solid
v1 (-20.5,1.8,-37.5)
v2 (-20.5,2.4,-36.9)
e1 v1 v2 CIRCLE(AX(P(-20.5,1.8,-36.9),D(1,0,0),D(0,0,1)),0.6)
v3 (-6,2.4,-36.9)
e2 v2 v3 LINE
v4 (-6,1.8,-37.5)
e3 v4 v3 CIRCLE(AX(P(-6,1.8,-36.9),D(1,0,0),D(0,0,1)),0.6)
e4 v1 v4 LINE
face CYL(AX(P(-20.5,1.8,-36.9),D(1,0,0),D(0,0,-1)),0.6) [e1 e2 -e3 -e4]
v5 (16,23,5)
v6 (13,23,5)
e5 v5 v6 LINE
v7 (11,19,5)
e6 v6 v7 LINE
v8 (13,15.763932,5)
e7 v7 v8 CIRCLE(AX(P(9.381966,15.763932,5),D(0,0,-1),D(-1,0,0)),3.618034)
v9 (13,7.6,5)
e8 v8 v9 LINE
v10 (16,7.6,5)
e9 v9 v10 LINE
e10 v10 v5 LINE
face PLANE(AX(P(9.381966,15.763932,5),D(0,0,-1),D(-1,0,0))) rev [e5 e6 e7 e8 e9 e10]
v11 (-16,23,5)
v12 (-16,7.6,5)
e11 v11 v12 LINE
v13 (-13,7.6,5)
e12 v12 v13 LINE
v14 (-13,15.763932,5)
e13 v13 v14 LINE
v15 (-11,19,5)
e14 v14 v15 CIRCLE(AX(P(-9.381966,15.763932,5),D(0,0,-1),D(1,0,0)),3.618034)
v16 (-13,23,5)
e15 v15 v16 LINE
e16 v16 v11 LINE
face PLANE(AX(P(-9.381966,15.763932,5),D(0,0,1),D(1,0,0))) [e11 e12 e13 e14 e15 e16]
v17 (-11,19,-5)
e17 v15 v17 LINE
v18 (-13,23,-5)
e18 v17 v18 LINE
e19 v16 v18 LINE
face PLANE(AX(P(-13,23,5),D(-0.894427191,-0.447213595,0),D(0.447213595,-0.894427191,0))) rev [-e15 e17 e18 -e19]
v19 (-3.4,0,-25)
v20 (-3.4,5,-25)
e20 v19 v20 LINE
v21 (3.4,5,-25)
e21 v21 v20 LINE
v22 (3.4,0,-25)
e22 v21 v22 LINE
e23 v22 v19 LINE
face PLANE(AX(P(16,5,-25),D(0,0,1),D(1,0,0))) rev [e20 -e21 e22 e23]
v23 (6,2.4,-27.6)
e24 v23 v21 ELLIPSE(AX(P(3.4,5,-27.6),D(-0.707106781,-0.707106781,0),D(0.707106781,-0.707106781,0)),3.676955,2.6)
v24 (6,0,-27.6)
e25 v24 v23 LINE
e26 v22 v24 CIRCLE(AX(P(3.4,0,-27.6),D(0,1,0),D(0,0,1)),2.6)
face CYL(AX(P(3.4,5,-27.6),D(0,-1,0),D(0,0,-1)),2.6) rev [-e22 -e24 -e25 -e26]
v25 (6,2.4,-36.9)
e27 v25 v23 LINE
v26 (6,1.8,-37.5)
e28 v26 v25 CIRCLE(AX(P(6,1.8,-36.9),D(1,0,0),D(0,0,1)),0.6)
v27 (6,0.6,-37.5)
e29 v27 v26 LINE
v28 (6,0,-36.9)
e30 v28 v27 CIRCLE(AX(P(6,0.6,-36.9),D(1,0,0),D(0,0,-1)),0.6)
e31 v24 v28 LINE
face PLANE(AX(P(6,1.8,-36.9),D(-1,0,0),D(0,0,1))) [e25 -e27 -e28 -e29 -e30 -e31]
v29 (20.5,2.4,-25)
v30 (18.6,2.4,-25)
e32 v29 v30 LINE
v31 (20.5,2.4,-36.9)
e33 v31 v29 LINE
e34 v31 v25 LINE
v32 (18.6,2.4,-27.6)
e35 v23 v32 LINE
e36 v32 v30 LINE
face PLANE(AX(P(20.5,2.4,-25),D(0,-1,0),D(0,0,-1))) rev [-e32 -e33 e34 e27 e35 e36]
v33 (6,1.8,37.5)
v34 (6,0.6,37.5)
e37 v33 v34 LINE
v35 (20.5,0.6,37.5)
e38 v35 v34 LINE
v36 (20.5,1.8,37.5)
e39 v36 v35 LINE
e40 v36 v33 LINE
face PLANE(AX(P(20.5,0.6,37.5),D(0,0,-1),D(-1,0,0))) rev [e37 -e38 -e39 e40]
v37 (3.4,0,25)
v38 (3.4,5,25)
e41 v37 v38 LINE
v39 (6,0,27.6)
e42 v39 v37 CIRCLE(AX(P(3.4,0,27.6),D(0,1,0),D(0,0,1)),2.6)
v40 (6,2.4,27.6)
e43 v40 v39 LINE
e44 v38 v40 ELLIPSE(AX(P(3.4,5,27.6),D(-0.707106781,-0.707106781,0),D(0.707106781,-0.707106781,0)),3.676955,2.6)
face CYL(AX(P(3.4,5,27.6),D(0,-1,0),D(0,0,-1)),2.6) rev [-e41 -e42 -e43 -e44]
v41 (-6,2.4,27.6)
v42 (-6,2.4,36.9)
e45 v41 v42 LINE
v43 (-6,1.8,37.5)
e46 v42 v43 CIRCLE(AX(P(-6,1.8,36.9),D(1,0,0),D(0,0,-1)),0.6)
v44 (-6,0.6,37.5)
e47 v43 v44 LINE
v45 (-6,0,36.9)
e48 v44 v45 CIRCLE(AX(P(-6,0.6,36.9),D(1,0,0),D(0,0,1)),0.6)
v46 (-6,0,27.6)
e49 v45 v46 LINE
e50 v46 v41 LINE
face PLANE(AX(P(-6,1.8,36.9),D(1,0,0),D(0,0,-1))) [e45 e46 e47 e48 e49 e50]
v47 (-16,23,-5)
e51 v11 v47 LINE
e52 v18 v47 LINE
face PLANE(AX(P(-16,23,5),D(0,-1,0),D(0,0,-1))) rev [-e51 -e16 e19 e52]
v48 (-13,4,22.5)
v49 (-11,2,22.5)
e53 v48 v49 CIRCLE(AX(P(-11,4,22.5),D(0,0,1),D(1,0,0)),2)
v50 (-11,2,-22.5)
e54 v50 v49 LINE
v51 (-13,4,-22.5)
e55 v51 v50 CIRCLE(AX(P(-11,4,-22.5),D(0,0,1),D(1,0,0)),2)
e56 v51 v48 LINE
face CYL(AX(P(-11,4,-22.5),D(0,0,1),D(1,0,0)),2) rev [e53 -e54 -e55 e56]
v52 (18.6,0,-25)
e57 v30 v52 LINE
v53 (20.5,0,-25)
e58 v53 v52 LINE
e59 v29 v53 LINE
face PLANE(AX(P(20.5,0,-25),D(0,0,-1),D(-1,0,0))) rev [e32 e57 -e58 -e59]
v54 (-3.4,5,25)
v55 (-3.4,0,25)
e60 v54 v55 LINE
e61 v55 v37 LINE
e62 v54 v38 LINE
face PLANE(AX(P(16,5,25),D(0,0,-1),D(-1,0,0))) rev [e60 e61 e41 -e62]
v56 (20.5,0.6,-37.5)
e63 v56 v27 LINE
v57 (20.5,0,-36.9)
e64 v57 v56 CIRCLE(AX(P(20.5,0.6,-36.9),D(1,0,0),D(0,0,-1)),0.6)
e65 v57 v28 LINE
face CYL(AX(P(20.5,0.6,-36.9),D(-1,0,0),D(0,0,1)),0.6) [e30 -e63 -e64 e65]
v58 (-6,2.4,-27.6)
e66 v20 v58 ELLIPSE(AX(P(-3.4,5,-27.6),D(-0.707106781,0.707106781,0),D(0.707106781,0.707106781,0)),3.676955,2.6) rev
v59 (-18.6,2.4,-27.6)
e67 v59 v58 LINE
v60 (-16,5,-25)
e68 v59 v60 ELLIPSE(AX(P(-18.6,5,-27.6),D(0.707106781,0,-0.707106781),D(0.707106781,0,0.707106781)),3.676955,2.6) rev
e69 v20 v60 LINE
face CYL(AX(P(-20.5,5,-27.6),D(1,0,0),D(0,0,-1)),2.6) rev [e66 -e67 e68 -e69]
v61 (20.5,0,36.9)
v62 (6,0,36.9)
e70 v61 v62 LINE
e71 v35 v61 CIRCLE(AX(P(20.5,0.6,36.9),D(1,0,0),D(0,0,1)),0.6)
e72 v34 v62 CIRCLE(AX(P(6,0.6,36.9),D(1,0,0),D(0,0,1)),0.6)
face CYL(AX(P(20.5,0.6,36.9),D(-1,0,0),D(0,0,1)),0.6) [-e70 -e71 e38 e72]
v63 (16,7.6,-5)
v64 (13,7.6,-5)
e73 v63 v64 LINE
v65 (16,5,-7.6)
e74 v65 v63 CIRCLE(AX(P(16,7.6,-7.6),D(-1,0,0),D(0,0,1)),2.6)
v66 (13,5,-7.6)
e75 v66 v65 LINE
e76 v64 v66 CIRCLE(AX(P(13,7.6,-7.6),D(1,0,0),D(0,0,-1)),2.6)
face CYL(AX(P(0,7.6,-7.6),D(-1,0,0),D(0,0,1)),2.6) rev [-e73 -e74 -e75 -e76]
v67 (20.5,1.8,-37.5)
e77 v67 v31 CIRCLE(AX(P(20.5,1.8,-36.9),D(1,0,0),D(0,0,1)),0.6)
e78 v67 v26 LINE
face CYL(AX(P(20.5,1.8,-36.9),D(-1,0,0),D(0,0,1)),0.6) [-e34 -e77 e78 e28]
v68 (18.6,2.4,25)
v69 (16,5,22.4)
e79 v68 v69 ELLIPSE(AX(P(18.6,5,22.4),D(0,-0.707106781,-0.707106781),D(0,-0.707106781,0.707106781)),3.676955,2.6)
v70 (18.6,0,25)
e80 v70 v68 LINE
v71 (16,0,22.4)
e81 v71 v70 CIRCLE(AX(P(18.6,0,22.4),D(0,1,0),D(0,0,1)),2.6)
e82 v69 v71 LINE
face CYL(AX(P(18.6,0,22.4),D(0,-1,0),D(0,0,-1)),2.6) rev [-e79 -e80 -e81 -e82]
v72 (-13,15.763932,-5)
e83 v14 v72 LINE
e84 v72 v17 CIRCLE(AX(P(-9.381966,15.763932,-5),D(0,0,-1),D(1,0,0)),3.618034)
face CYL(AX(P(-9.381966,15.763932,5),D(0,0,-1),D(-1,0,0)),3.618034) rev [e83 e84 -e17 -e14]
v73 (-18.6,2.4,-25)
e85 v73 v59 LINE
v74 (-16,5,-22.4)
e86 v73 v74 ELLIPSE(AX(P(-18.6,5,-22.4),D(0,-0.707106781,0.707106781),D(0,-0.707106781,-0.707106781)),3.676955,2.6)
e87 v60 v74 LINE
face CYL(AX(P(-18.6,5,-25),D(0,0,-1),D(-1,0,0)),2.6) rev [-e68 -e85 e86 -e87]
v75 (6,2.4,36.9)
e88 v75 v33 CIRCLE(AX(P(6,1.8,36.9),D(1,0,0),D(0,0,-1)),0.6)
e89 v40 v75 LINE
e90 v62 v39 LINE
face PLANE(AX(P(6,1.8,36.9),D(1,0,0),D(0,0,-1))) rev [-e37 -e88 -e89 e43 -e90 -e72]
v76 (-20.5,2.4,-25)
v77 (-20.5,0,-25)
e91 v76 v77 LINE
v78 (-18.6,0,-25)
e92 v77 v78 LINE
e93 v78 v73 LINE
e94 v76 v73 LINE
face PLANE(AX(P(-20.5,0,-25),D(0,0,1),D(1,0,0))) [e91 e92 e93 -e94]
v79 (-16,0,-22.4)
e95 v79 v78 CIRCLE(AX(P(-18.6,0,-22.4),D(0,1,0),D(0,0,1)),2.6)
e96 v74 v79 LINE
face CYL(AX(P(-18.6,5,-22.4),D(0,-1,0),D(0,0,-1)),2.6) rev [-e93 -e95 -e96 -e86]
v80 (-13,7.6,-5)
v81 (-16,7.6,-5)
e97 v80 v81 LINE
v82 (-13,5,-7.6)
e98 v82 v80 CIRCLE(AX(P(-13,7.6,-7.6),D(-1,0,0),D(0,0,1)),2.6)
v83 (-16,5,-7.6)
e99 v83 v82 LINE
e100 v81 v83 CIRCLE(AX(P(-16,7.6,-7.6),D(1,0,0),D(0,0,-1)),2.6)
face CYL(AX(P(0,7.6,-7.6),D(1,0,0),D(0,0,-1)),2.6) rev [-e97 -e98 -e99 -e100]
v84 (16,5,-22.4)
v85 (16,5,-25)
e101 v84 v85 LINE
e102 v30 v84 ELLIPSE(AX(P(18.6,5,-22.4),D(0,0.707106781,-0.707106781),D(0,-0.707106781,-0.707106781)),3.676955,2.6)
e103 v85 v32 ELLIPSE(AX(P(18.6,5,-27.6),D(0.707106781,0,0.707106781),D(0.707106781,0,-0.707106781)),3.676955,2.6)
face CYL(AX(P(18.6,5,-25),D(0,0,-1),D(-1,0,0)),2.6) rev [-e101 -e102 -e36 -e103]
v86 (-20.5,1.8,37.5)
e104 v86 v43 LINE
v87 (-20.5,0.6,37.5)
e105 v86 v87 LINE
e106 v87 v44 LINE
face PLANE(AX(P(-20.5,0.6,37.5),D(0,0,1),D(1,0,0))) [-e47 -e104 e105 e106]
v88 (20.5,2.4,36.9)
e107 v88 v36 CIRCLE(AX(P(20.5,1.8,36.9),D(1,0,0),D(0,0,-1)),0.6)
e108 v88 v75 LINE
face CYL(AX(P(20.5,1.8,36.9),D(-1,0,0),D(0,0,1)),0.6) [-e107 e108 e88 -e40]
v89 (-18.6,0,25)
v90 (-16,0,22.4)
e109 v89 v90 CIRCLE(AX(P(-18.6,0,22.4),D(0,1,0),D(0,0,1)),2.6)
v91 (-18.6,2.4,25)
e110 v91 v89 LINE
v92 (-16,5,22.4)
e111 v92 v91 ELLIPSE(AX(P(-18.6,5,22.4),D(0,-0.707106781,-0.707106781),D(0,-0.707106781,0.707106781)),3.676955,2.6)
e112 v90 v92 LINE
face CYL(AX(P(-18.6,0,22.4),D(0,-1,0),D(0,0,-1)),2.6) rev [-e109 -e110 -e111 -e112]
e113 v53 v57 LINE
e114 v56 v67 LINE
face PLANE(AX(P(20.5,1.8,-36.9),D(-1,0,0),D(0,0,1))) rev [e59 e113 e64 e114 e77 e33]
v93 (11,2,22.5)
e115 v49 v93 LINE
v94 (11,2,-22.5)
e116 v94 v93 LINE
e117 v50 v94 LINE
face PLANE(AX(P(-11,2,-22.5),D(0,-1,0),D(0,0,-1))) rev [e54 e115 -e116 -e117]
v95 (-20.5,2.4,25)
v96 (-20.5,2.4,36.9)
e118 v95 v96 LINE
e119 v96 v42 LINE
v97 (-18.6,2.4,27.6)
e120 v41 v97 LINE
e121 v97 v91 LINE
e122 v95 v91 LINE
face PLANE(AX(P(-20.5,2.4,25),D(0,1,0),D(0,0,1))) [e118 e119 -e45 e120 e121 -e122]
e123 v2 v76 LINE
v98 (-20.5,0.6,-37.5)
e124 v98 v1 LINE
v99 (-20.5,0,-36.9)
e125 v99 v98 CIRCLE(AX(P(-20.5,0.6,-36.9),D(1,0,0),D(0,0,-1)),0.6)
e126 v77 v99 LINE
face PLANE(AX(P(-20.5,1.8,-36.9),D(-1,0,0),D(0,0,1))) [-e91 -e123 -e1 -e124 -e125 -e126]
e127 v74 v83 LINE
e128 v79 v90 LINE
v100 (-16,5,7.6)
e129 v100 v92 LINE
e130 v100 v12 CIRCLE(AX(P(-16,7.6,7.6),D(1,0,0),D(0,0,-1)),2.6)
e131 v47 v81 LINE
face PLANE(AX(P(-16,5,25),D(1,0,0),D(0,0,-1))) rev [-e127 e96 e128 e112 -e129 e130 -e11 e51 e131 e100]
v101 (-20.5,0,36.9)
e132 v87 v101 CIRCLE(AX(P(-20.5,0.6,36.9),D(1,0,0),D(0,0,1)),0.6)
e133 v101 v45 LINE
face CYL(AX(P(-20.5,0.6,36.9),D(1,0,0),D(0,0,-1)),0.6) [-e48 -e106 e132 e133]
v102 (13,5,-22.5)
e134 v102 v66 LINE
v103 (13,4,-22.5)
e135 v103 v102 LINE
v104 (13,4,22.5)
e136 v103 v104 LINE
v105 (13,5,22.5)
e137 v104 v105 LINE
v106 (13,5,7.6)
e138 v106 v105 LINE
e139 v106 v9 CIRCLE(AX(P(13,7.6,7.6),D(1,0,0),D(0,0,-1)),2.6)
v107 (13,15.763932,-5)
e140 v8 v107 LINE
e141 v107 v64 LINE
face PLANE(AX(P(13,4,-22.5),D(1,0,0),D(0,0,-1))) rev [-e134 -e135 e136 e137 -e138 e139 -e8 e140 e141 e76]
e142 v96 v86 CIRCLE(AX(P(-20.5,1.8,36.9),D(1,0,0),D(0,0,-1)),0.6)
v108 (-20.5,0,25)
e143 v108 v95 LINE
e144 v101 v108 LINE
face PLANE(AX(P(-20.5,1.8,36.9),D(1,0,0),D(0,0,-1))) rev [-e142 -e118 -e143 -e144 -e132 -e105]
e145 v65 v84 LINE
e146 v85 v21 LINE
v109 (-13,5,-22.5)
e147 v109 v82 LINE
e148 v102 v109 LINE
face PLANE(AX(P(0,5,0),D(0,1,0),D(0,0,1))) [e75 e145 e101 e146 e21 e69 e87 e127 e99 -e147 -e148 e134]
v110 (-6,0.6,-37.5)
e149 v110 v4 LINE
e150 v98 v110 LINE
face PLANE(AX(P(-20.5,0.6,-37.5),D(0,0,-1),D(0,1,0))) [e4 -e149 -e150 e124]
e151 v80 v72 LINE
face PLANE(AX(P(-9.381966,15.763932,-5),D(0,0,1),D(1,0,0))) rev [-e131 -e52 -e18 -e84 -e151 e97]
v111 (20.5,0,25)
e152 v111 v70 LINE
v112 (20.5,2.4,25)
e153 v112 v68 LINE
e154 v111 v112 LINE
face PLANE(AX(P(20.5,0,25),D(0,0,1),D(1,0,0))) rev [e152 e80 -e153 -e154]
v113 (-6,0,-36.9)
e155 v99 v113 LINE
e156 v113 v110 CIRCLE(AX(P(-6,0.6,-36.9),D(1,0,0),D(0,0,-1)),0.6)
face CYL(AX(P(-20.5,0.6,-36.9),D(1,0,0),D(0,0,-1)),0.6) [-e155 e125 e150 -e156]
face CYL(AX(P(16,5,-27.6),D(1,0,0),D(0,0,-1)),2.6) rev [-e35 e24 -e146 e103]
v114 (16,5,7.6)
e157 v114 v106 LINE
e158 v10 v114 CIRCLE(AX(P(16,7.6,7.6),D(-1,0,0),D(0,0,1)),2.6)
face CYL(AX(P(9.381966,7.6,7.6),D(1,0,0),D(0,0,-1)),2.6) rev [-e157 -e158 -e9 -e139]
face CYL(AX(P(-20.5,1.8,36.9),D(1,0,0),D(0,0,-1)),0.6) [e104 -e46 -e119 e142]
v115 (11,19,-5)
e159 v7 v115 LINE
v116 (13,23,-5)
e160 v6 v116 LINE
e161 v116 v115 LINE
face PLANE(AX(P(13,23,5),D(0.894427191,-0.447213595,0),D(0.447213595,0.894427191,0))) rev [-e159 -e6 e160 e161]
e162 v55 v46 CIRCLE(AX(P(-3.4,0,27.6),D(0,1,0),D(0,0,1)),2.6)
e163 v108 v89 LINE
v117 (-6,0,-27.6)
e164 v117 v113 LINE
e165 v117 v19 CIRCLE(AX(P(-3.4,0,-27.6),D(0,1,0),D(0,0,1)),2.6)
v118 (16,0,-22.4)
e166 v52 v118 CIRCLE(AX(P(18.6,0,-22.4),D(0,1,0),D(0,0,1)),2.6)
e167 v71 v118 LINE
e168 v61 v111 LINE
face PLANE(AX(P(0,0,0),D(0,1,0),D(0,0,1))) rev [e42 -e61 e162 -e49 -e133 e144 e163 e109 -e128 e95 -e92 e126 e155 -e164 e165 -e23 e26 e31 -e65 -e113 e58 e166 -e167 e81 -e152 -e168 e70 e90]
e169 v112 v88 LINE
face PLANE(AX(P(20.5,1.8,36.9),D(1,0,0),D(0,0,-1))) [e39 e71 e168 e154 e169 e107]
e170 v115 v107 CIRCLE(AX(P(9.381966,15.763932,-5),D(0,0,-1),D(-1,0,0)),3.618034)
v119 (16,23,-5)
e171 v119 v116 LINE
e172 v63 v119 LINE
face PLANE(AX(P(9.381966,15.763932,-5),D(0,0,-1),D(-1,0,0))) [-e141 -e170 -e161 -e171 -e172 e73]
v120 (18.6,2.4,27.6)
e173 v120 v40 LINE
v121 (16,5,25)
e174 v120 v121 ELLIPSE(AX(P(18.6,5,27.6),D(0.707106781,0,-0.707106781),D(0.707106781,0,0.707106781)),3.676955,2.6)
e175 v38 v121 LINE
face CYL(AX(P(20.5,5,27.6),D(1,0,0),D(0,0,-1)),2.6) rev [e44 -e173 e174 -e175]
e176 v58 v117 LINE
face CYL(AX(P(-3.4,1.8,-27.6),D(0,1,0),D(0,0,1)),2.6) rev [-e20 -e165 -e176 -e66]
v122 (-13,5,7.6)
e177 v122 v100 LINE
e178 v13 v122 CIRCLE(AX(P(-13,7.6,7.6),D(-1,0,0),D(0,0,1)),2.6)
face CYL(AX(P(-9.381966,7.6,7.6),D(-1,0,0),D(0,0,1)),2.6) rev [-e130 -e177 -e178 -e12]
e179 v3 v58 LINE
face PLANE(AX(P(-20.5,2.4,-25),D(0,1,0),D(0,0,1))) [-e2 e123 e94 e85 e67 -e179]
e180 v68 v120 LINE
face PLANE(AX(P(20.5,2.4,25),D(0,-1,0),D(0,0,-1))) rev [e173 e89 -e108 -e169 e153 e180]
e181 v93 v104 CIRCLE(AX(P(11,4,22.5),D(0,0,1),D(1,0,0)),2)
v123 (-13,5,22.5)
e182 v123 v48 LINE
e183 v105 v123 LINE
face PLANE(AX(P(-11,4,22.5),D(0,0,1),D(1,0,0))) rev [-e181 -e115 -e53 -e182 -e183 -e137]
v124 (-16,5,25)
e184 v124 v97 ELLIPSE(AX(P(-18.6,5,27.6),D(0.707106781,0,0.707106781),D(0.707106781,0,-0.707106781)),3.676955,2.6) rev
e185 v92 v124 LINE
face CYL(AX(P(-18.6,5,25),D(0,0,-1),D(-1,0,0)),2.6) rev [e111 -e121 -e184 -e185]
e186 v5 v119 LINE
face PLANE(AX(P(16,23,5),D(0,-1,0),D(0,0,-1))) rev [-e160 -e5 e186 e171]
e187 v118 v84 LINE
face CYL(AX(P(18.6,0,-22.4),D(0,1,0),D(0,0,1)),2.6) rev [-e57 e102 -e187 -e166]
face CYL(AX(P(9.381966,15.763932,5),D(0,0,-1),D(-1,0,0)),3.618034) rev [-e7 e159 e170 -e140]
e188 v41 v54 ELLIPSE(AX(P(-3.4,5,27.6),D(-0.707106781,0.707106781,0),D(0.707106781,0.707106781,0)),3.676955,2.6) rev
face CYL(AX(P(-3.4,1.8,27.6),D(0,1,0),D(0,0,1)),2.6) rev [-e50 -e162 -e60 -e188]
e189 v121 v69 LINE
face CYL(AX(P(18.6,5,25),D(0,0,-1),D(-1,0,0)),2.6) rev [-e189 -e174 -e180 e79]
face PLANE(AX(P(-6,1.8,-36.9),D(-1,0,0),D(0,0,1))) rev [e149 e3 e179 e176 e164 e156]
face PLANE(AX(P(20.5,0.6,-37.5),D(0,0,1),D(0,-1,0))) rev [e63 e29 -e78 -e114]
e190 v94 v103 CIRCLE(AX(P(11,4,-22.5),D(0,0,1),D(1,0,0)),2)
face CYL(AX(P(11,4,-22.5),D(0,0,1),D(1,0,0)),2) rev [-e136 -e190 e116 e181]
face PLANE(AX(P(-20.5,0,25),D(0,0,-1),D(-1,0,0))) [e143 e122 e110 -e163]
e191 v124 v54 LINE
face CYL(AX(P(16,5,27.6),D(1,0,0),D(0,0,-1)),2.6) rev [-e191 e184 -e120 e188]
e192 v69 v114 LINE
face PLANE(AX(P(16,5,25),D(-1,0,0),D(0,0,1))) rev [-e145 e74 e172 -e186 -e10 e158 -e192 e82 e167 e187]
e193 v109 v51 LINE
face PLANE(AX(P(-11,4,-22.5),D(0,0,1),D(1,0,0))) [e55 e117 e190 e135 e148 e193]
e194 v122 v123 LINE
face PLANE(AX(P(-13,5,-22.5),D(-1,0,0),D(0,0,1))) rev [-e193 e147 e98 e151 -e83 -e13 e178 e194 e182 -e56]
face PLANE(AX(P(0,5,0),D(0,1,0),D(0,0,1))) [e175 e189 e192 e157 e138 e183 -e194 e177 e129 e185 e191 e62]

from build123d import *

# Parameters (mm, degrees)
SKETCH1_W                = 32
SKETCH1_H                = 50
BOSS_EXTRUDE1_DEPTH      = 5
CUT_EXTRUDE1_DEPTH       = 22.5
BOSS_EXTRUDE2_DEPTH      = 5
BOSS_EXTRUDE3_DEPTH      = 10
BOSS_EXTRUDE3_DEPTH_BACK = 4.5
BOSS_EXTRUDE3_START      = -16
BOSS_EXTRUDE4_START      = 6
BOSS_EXTRUDE4_DEPTH      = 14.5
FILLET1_R                = 2.6
FILLET2_R                = 2.6


with BuildPart() as part:
    # Sketch1 → Boss-Extrude1 (new body)
    with BuildSketch(Plane(origin=(0, 0, 0), x_dir=(1, 0, 0), z_dir=(0, 1, 0))):
        Rectangle(SKETCH1_W, SKETCH1_H)
    extrude(amount=BOSS_EXTRUDE1_DEPTH)

    # Sketch2 → Cut-Extrude1 (cut, symmetric)
    with BuildSketch(Plane.XY):
        with BuildLine():
            Line((-11, 2), (11, 2))
            ThreePointArc((11, 2), (12.414213562, 2.585786438), (13, 4))
            Line((13, 4), (13, 5))
            Line((13, 5), (-13, 5))
            Line((-13, 5), (-13, 4))
            ThreePointArc((-13, 4), (-12.414213562, 2.585786438), (-11, 2))
        make_face()
    extrude(amount=CUT_EXTRUDE1_DEPTH, both=True, mode=Mode.SUBTRACT)

    # Sketch3 → Boss-Extrude2 (add, symmetric)
    with BuildSketch(Plane.XY):
        with BuildLine():
            Line((-16, 5), (-16, 23))
            Line((-16, 23), (-13, 23))
            Line((-13, 23), (-11, 19))
            ThreePointArc((-11, 19), (-12.459649548, 17.666045055), (-13, 15.763932023))
            Line((-13, 15.763932023), (-13, 5))
            Line((-13, 5), (-16, 5))
        make_face()
        with BuildLine():
            Line((16, 5), (13, 5))
            Line((13, 5), (13, 15.763932023))
            ThreePointArc((13, 15.763932023), (12.459649548, 17.666045055), (11, 19))
            Line((11, 19), (13, 23))
            Line((13, 23), (16, 23))
            Line((16, 23), (16, 5))
        make_face()
    extrude(amount=BOSS_EXTRUDE2_DEPTH, both=True)

    # Sketch4 → Boss-Extrude3 (add, two sides: drawn at the far end of the back side and taken through both)
    with BuildSketch(Plane(origin=(0, 0, 0), x_dir=(0, 0, -1), z_dir=(1, 0, 0)).offset(BOSS_EXTRUDE3_START - BOSS_EXTRUDE3_DEPTH_BACK)):
        with BuildLine():
            Line((25, 0), (36.9, 0))
            ThreePointArc((36.9, 0), (37.324264069, 0.175735931), (37.5, 0.6))
            Line((37.5, 0.6), (37.5, 1.8))
            ThreePointArc((37.5, 1.8), (37.324264069, 2.224264069), (36.9, 2.4))
            Line((36.9, 2.4), (25, 2.4))
            Line((25, 2.4), (25, 0))
        make_face()
        with BuildLine():
            Line((-25, 0), (-36.9, 0))
            ThreePointArc((-36.9, 0), (-37.324264069, 0.175735931), (-37.5, 0.6))
            Line((-37.5, 0.6), (-37.5, 1.8))
            ThreePointArc((-37.5, 1.8), (-37.324264069, 2.224264069), (-36.9, 2.4))
            Line((-36.9, 2.4), (-25, 2.4))
            Line((-25, 2.4), (-25, 0))
        make_face()
    extrude(amount=BOSS_EXTRUDE3_DEPTH + BOSS_EXTRUDE3_DEPTH_BACK)

    # Sketch4<2> → Boss-Extrude4 (add)
    with BuildSketch(Plane(origin=(0, 0, 0), x_dir=(0, 0, -1), z_dir=(1, 0, 0)).offset(BOSS_EXTRUDE4_START)):
        with BuildLine():
            Line((25, 0), (36.9, 0))
            ThreePointArc((36.9, 0), (37.324264069, 0.175735931), (37.5, 0.6))
            Line((37.5, 0.6), (37.5, 1.8))
            ThreePointArc((37.5, 1.8), (37.324264069, 2.224264069), (36.9, 2.4))
            Line((36.9, 2.4), (25, 2.4))
            Line((25, 2.4), (25, 0))
        make_face()
        with BuildLine():
            Line((-25, 0), (-36.9, 0))
            ThreePointArc((-36.9, 0), (-37.324264069, 0.175735931), (-37.5, 0.6))
            Line((-37.5, 0.6), (-37.5, 1.8))
            ThreePointArc((-37.5, 1.8), (-37.324264069, 2.224264069), (-36.9, 2.4))
            Line((-36.9, 2.4), (-25, 2.4))
            Line((-25, 2.4), (-25, 0))
        make_face()
    extrude(amount=BOSS_EXTRUDE4_DEPTH)

    # Fillet1
    fillet1_edges = [part.edges().sort_by_distance(p)[0] for p in [
        (-14.5, 5, 5),
        (14.5, 5, 5),
        (-14.5, 5, -5),
        (14.5, 5, -5),
        (-6, 1.2, -25),
        (6, 1.2, -25),
        (6, 1.2, 25),
        (-6, 1.2, 25),
        (-11, 2.4, -25),
        (11, 2.4, -25),
        (-11, 2.4, 25),
        (11, 2.4, 25),
    ]]
    fillet(fillet1_edges, radius=FILLET1_R - 0.0001)  # a hair under: the kernel refuses the full size

    # Fillet2
    fillet2_edges = [part.edges().sort_by_distance(p)[0] for p in [
        (-16, 2.4, 26.29995),
        (-16, 2.4, -26.29995),
        (-16, 1.2, 25),
        (-16, 1.2, -25),
        (16, 1.2, -25),
        (16, 2.4, -26.29995),
        (16, 2.4, 26.29995),
        (16, 1.2, 25),
    ]]
    fillet(fillet2_edges, radius=FILLET2_R - 0.0004)  # a hair under: the kernel refuses the full size


solid = part.part
